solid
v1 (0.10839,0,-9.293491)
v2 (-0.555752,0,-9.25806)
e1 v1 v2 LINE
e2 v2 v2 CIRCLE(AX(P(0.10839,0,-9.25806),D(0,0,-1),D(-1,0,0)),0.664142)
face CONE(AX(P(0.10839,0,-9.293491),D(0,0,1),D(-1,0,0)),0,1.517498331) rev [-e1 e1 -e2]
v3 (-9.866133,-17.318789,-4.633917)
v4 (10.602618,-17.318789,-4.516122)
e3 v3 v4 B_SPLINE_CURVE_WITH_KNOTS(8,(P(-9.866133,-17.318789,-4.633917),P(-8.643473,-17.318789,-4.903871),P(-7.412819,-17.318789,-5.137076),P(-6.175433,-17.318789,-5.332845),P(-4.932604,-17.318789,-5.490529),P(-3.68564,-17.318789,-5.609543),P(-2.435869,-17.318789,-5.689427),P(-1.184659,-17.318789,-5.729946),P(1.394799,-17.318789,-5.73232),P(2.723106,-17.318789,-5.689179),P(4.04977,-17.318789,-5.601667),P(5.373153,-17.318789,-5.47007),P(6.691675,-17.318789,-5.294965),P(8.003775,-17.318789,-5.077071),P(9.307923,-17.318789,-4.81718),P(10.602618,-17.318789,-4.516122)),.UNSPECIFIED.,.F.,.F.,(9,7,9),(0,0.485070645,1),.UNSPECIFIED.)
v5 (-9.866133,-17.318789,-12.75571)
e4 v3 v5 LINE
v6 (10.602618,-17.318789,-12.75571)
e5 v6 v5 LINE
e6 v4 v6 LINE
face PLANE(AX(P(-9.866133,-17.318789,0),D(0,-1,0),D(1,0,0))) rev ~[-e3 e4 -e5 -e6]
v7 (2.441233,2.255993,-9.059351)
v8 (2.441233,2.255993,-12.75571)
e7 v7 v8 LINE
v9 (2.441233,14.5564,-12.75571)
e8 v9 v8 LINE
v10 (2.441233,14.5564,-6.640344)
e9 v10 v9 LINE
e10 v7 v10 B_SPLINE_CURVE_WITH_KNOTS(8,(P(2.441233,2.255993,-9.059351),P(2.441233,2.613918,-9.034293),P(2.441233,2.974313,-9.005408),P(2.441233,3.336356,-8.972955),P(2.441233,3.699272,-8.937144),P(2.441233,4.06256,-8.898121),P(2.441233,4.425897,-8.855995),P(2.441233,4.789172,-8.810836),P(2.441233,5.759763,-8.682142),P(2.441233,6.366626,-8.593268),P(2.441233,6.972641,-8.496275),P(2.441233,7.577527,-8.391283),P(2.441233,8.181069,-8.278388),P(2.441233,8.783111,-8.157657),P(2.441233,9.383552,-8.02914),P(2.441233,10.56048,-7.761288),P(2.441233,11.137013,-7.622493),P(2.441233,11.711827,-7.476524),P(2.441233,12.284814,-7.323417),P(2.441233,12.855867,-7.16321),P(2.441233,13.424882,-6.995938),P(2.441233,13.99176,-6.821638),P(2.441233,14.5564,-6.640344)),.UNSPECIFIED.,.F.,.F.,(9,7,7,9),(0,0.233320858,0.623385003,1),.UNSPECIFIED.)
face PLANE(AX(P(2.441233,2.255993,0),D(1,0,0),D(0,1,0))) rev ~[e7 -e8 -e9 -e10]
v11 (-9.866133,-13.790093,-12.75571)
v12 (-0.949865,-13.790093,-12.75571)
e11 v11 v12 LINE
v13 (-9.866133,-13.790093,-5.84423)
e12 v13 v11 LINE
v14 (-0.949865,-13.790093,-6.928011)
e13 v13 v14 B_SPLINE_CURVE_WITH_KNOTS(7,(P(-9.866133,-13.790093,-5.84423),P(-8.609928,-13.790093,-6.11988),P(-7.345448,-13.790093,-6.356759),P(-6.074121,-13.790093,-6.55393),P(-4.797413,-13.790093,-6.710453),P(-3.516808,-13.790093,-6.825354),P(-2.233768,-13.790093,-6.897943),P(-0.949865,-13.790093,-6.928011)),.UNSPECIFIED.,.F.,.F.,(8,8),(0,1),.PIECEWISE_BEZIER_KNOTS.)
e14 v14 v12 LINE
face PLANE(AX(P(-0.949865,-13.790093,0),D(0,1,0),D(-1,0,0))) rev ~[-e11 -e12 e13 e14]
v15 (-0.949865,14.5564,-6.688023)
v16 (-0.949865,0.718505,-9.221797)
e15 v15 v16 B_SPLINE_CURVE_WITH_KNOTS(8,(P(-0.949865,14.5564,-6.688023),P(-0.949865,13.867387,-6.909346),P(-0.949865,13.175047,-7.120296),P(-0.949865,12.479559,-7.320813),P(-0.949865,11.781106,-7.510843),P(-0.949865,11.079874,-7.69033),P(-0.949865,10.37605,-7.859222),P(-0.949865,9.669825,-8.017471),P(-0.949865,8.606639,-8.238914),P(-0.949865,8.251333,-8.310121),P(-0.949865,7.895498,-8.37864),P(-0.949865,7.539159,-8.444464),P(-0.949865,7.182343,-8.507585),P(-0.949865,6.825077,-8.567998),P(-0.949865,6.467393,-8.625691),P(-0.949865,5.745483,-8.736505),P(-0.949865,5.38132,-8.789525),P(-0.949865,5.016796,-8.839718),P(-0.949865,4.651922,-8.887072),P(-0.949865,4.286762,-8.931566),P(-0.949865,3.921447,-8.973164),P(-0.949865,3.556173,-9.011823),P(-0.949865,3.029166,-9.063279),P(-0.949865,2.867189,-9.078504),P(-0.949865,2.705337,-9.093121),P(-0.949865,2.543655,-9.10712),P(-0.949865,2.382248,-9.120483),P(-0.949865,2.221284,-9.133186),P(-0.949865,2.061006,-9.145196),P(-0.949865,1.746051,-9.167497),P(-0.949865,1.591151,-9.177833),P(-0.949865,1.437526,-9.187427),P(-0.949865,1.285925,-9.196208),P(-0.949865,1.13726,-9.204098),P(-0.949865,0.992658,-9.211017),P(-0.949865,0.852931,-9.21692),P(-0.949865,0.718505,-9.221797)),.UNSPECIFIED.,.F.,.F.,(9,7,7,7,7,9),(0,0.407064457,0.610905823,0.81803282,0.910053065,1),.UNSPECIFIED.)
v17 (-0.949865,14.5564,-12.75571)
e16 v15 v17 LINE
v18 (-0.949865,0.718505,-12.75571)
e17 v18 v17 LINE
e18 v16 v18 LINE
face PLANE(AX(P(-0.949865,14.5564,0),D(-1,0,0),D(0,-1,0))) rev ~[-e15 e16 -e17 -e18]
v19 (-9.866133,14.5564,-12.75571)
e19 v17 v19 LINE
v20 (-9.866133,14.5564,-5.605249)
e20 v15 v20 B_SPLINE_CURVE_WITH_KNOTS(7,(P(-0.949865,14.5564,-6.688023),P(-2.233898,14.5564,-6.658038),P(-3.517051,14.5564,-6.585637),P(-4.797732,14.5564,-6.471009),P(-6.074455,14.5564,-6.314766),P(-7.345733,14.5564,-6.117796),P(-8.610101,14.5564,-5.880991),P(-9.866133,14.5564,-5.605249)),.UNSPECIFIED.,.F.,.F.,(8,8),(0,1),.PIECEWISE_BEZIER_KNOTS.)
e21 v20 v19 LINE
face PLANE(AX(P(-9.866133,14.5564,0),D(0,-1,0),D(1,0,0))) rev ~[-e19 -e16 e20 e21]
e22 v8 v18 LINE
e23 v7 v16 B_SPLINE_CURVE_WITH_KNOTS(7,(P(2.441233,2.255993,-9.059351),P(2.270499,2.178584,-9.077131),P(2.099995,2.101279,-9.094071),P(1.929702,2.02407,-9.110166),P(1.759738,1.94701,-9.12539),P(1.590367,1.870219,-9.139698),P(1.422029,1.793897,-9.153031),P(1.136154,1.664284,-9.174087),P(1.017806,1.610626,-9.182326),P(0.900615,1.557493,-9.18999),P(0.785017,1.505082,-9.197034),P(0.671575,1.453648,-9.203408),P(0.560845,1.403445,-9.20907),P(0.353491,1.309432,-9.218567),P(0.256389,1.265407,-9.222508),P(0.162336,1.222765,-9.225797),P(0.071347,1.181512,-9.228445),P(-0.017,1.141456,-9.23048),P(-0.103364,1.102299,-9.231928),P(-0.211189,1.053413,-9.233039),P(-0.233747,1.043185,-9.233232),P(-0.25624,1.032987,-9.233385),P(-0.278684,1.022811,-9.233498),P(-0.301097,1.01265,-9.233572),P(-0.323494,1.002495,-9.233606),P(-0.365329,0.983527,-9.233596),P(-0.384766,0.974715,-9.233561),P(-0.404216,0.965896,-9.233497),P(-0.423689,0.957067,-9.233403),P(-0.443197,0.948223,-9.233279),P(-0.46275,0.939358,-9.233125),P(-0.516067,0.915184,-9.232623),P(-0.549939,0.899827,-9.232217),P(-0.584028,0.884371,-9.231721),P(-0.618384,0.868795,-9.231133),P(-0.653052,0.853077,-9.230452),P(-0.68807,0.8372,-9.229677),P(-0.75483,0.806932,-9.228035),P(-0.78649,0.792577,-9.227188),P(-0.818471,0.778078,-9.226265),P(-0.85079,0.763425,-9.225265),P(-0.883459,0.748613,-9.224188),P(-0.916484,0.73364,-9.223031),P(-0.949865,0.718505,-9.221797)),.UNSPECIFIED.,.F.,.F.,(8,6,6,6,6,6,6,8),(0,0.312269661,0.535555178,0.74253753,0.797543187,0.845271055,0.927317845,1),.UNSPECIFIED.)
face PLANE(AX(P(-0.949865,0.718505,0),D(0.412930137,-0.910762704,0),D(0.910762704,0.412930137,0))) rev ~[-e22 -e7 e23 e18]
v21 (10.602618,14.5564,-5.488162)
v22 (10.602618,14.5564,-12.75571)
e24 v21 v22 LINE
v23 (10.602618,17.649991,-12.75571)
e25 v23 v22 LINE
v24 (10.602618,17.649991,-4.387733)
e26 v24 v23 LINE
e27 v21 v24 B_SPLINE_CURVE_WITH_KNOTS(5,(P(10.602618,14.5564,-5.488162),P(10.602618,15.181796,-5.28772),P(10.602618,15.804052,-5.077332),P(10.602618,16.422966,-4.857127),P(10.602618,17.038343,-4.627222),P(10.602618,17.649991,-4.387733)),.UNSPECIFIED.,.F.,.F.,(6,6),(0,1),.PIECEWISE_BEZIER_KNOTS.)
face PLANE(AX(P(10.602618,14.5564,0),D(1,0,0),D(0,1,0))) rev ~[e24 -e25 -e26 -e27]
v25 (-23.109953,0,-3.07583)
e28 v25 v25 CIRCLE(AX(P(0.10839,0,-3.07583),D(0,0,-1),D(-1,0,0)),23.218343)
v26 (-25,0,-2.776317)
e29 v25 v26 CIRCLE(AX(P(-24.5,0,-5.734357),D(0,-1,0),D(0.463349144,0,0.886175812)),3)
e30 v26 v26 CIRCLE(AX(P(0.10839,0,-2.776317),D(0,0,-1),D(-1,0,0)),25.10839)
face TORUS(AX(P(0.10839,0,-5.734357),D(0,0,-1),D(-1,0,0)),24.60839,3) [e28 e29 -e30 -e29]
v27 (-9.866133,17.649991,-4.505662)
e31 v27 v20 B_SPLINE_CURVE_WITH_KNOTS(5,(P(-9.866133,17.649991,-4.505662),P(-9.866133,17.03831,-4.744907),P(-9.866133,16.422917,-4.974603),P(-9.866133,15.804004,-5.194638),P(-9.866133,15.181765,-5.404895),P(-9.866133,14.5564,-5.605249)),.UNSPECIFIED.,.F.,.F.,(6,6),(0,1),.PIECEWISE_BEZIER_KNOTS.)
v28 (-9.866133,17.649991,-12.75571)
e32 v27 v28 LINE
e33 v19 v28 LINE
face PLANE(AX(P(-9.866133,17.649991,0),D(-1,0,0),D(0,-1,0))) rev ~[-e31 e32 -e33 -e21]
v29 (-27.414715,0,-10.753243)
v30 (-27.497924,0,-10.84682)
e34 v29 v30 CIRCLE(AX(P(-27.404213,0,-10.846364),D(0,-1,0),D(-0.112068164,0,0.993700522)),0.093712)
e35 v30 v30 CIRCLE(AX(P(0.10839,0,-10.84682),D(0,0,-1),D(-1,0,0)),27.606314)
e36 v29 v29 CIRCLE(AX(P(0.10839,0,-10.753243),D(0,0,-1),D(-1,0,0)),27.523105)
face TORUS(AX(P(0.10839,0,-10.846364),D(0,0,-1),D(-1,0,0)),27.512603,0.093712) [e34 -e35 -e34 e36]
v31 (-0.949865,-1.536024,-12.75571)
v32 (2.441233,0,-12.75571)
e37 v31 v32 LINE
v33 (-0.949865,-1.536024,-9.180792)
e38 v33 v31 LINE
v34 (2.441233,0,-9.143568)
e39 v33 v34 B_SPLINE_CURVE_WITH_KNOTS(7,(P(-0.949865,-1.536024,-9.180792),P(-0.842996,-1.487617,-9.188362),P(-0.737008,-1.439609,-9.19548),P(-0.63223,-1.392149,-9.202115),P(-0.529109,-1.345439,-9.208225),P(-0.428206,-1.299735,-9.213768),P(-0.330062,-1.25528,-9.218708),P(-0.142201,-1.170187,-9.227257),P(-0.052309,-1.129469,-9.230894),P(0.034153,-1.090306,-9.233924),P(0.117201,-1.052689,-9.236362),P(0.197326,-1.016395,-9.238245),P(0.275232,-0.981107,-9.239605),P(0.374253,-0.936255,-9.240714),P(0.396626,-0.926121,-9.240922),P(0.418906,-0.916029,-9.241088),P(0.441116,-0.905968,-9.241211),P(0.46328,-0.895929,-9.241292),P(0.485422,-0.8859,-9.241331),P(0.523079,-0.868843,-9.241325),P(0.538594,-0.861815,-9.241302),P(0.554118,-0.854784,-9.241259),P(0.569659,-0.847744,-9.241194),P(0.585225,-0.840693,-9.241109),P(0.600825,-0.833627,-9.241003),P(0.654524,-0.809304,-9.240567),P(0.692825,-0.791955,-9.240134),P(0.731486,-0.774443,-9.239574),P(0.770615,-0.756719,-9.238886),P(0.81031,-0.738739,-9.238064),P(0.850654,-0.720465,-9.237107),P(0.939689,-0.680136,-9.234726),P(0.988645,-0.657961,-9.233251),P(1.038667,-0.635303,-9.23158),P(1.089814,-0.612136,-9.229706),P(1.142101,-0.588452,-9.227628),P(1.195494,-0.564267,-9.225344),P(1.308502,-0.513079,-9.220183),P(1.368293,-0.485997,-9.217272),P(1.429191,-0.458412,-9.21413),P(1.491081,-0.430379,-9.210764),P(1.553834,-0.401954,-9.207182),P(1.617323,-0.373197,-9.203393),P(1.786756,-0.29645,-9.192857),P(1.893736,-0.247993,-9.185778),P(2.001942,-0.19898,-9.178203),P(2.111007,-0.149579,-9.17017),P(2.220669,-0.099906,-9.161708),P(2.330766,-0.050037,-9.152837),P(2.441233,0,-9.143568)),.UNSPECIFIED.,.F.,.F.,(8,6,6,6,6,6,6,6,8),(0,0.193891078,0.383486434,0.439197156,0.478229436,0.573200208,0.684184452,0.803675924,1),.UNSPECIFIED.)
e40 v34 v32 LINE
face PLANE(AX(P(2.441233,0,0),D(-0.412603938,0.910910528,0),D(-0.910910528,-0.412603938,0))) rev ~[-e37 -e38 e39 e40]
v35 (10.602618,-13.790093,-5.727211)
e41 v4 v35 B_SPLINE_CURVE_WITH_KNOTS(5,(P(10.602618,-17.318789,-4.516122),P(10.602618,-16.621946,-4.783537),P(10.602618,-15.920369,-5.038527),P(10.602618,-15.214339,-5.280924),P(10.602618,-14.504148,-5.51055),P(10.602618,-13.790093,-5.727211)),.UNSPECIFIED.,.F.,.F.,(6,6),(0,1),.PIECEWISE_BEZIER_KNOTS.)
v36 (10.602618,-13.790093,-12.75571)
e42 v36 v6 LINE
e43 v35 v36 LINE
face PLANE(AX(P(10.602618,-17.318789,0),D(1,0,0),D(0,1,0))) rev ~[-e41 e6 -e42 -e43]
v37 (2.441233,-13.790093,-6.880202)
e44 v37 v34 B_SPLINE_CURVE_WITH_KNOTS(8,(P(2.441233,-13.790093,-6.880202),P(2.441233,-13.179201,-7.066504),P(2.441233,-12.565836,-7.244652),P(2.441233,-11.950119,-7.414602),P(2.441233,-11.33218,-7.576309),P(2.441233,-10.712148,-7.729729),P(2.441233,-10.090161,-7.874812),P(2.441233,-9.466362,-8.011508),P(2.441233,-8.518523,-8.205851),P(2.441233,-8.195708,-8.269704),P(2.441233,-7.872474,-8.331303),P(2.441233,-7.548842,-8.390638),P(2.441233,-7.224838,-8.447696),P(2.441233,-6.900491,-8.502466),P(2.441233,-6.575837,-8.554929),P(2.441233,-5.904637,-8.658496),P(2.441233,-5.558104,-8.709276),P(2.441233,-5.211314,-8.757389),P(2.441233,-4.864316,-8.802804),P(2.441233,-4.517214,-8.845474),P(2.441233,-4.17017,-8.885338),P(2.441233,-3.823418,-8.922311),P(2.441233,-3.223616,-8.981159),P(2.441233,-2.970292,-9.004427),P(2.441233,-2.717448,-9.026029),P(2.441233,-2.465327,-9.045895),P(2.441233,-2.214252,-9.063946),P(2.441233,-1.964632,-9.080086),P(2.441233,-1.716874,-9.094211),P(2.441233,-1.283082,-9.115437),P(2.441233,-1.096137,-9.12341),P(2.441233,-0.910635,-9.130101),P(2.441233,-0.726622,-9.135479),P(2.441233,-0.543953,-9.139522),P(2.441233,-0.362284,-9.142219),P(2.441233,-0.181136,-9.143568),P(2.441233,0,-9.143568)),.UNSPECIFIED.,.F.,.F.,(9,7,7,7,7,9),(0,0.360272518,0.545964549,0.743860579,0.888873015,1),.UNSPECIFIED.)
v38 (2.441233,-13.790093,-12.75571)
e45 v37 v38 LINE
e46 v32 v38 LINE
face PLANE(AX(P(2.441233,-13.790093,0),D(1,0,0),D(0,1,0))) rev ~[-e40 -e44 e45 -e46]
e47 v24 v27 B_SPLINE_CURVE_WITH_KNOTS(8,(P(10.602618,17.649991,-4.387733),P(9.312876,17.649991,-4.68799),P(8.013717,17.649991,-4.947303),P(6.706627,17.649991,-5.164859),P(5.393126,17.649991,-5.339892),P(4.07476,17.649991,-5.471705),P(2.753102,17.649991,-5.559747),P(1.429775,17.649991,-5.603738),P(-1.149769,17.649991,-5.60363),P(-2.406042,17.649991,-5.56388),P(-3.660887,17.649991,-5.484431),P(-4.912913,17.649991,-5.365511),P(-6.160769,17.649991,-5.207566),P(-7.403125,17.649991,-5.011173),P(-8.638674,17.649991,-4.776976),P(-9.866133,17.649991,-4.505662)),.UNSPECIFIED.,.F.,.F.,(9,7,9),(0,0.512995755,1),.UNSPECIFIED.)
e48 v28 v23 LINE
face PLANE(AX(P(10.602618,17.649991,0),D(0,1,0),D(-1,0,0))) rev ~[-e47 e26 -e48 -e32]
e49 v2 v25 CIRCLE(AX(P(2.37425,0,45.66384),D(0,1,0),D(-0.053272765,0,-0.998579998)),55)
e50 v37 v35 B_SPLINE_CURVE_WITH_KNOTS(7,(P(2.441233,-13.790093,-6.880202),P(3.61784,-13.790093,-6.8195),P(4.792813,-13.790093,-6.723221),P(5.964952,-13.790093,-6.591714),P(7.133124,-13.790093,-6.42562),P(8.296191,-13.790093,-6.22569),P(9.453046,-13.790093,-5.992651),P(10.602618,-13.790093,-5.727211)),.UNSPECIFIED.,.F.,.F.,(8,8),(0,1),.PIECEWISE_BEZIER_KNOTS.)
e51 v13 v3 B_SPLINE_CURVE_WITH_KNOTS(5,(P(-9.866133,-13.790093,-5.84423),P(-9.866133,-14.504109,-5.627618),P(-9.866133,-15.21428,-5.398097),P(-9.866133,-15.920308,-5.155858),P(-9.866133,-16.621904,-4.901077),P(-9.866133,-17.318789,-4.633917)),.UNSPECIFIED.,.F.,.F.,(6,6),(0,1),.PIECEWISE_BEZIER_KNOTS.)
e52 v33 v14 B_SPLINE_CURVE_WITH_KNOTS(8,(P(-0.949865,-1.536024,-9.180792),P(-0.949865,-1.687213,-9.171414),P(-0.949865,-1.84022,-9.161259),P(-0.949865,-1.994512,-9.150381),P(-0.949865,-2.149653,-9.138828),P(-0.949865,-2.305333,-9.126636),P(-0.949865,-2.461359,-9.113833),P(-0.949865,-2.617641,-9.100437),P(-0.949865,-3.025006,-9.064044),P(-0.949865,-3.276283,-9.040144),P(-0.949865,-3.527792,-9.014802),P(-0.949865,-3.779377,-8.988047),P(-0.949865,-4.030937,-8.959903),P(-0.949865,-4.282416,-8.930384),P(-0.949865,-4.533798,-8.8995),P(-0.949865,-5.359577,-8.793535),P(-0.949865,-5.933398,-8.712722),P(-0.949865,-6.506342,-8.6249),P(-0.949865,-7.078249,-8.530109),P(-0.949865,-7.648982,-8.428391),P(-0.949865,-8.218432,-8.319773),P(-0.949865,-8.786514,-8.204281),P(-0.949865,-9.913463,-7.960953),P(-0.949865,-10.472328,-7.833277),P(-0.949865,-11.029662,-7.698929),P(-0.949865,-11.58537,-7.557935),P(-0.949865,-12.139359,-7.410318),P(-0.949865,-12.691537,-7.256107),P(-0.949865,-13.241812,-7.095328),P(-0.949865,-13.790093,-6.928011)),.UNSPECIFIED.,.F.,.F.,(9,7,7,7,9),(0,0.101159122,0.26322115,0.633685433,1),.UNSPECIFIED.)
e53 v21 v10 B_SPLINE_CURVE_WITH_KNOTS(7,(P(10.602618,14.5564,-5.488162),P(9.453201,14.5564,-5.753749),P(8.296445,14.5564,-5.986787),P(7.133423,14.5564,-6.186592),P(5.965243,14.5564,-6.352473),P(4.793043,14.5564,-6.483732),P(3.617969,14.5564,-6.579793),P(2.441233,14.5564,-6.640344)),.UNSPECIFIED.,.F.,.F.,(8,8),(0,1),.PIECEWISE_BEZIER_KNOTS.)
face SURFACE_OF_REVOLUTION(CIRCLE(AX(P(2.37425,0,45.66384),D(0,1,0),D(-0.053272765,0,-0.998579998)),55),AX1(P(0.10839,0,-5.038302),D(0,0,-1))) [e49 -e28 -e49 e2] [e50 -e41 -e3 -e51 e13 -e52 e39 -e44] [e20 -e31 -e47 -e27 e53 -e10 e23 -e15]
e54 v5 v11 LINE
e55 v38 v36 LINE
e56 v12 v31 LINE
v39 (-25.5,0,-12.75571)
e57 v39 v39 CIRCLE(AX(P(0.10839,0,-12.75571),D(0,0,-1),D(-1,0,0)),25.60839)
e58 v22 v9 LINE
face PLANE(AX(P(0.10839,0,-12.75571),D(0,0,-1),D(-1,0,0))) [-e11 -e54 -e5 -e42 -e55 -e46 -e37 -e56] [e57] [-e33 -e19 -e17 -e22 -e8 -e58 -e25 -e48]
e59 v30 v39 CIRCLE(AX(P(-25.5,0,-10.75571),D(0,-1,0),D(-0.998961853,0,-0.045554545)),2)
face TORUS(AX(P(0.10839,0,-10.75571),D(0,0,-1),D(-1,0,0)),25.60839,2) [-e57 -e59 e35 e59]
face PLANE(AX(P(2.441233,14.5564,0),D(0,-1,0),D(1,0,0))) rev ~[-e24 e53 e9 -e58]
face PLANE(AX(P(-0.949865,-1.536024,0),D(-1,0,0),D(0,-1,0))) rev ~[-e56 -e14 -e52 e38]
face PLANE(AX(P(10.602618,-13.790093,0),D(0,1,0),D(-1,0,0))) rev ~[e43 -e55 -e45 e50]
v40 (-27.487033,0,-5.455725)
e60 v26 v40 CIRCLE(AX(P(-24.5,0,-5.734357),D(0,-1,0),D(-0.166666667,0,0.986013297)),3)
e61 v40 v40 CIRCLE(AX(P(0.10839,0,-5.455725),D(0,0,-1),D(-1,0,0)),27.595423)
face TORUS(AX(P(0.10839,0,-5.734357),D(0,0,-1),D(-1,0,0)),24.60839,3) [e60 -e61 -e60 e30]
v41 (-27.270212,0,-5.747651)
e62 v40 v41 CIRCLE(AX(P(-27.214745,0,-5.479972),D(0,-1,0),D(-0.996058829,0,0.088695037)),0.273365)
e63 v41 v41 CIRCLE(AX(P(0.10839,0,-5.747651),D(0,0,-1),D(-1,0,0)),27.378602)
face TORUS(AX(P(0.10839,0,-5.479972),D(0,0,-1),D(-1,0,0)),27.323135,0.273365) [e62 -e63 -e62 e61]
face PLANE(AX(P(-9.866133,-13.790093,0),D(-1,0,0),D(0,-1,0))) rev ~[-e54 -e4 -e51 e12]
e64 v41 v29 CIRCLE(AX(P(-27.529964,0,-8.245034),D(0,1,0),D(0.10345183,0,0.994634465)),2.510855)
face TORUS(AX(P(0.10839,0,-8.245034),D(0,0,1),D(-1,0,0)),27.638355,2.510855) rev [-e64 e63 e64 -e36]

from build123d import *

# Parameters (mm, degrees)
F3_DEPTH = 25


# Not quite as in the source:
# - a feature names something its author has since deleted; it is built from what else it names


with BuildPart() as f1:
    # F0 (on Front) → F1 (revolve)
    with BuildSketch(Plane.XZ):
        with BuildLine():
            ThreePointArc((-27.4979237057, -10.8468195568), (-26.8816261832, -12.2017772322), (-25.5, -12.7557104668))
            Line((-25.5, -12.7557104668), (-25, -12.7557104668))
            Line((-25, -12.7557104668), (-25, -2.7763174613))
            ThreePointArc((-25, -2.7763174613), (-26.6987851099, -3.6934399021), (-27.4870326809, -5.4557254034))
            ThreePointArc((-27.4870326809, -5.4557254034), (-27.4342006293, -5.6429676648), (-27.2702117083, -5.7476506334))
            ThreePointArc((-27.2702117083, -5.7476506334), (-25.02015453, -8.3174880746), (-27.4147150934, -10.7532428834))
            ThreePointArc((-27.4147150934, -10.7532428834), (-27.4742431694, -10.784093359), (-27.4979237057, -10.8468195568))
        make_face()
        with BuildLine():
            Line((-25, -2.7763174613), (-25, -12.7557104668))
            Line((-25, -12.7557104668), (0.1083903732, -12.7557104668))
            Line((0.1083903732, -12.7557104668), (0.1083903732, -9.7607430522))
            Line((0.1083903732, -9.7607430522), (0.1083903732, -9.2934911311))
            Line((0.1083903732, -9.2934911311), (-0.5557517075, -9.2580601338))
            ThreePointArc((-0.5557517075, -9.2580601338), (-12.1652391069, -7.3795693077), (-23.1099525663, -3.075829916))
            ThreePointArc((-23.1099525663, -3.075829916), (-24.0304544365, -2.7713306969), (-25, -2.7763174613))
        make_face()
    revolve(axis=Axis((0.1083903732, 0, -5.038301622), (0, 0, -1)))

    # F2 (on Top) → F3 (cut)
    with BuildSketch(Plane.XY):
        Polygon((2.4412334897, 0), (-0.9498652071, -1.5360242687), (-0.9498652071, -13.7900933623), (-9.8661333323, -13.7900933623), (-9.8661333323, -17.3187889159), (10.6026176363, -17.3187889159), (10.6026176363, -13.7900933623), (2.4412334897, -13.7900933623), align=None)
        Polygon((-0.9498652071, 14.5563995466), (-0.9498652071, 1.5588715905), (-0.9498652071, 0.7185048307), (2.4412334897, 2.2559929639), (2.4412334897, 3.1213716138), (2.4412334897, 14.5563995466), (10.6026176363, 14.5563995466), (10.6026176363, 17.6499914378), (-9.8661333323, 17.6499914378), (-9.8661333323, 14.5563995466), align=None)
    extrude(amount=-F3_DEPTH, mode=Mode.SUBTRACT)


solid = f1.part
